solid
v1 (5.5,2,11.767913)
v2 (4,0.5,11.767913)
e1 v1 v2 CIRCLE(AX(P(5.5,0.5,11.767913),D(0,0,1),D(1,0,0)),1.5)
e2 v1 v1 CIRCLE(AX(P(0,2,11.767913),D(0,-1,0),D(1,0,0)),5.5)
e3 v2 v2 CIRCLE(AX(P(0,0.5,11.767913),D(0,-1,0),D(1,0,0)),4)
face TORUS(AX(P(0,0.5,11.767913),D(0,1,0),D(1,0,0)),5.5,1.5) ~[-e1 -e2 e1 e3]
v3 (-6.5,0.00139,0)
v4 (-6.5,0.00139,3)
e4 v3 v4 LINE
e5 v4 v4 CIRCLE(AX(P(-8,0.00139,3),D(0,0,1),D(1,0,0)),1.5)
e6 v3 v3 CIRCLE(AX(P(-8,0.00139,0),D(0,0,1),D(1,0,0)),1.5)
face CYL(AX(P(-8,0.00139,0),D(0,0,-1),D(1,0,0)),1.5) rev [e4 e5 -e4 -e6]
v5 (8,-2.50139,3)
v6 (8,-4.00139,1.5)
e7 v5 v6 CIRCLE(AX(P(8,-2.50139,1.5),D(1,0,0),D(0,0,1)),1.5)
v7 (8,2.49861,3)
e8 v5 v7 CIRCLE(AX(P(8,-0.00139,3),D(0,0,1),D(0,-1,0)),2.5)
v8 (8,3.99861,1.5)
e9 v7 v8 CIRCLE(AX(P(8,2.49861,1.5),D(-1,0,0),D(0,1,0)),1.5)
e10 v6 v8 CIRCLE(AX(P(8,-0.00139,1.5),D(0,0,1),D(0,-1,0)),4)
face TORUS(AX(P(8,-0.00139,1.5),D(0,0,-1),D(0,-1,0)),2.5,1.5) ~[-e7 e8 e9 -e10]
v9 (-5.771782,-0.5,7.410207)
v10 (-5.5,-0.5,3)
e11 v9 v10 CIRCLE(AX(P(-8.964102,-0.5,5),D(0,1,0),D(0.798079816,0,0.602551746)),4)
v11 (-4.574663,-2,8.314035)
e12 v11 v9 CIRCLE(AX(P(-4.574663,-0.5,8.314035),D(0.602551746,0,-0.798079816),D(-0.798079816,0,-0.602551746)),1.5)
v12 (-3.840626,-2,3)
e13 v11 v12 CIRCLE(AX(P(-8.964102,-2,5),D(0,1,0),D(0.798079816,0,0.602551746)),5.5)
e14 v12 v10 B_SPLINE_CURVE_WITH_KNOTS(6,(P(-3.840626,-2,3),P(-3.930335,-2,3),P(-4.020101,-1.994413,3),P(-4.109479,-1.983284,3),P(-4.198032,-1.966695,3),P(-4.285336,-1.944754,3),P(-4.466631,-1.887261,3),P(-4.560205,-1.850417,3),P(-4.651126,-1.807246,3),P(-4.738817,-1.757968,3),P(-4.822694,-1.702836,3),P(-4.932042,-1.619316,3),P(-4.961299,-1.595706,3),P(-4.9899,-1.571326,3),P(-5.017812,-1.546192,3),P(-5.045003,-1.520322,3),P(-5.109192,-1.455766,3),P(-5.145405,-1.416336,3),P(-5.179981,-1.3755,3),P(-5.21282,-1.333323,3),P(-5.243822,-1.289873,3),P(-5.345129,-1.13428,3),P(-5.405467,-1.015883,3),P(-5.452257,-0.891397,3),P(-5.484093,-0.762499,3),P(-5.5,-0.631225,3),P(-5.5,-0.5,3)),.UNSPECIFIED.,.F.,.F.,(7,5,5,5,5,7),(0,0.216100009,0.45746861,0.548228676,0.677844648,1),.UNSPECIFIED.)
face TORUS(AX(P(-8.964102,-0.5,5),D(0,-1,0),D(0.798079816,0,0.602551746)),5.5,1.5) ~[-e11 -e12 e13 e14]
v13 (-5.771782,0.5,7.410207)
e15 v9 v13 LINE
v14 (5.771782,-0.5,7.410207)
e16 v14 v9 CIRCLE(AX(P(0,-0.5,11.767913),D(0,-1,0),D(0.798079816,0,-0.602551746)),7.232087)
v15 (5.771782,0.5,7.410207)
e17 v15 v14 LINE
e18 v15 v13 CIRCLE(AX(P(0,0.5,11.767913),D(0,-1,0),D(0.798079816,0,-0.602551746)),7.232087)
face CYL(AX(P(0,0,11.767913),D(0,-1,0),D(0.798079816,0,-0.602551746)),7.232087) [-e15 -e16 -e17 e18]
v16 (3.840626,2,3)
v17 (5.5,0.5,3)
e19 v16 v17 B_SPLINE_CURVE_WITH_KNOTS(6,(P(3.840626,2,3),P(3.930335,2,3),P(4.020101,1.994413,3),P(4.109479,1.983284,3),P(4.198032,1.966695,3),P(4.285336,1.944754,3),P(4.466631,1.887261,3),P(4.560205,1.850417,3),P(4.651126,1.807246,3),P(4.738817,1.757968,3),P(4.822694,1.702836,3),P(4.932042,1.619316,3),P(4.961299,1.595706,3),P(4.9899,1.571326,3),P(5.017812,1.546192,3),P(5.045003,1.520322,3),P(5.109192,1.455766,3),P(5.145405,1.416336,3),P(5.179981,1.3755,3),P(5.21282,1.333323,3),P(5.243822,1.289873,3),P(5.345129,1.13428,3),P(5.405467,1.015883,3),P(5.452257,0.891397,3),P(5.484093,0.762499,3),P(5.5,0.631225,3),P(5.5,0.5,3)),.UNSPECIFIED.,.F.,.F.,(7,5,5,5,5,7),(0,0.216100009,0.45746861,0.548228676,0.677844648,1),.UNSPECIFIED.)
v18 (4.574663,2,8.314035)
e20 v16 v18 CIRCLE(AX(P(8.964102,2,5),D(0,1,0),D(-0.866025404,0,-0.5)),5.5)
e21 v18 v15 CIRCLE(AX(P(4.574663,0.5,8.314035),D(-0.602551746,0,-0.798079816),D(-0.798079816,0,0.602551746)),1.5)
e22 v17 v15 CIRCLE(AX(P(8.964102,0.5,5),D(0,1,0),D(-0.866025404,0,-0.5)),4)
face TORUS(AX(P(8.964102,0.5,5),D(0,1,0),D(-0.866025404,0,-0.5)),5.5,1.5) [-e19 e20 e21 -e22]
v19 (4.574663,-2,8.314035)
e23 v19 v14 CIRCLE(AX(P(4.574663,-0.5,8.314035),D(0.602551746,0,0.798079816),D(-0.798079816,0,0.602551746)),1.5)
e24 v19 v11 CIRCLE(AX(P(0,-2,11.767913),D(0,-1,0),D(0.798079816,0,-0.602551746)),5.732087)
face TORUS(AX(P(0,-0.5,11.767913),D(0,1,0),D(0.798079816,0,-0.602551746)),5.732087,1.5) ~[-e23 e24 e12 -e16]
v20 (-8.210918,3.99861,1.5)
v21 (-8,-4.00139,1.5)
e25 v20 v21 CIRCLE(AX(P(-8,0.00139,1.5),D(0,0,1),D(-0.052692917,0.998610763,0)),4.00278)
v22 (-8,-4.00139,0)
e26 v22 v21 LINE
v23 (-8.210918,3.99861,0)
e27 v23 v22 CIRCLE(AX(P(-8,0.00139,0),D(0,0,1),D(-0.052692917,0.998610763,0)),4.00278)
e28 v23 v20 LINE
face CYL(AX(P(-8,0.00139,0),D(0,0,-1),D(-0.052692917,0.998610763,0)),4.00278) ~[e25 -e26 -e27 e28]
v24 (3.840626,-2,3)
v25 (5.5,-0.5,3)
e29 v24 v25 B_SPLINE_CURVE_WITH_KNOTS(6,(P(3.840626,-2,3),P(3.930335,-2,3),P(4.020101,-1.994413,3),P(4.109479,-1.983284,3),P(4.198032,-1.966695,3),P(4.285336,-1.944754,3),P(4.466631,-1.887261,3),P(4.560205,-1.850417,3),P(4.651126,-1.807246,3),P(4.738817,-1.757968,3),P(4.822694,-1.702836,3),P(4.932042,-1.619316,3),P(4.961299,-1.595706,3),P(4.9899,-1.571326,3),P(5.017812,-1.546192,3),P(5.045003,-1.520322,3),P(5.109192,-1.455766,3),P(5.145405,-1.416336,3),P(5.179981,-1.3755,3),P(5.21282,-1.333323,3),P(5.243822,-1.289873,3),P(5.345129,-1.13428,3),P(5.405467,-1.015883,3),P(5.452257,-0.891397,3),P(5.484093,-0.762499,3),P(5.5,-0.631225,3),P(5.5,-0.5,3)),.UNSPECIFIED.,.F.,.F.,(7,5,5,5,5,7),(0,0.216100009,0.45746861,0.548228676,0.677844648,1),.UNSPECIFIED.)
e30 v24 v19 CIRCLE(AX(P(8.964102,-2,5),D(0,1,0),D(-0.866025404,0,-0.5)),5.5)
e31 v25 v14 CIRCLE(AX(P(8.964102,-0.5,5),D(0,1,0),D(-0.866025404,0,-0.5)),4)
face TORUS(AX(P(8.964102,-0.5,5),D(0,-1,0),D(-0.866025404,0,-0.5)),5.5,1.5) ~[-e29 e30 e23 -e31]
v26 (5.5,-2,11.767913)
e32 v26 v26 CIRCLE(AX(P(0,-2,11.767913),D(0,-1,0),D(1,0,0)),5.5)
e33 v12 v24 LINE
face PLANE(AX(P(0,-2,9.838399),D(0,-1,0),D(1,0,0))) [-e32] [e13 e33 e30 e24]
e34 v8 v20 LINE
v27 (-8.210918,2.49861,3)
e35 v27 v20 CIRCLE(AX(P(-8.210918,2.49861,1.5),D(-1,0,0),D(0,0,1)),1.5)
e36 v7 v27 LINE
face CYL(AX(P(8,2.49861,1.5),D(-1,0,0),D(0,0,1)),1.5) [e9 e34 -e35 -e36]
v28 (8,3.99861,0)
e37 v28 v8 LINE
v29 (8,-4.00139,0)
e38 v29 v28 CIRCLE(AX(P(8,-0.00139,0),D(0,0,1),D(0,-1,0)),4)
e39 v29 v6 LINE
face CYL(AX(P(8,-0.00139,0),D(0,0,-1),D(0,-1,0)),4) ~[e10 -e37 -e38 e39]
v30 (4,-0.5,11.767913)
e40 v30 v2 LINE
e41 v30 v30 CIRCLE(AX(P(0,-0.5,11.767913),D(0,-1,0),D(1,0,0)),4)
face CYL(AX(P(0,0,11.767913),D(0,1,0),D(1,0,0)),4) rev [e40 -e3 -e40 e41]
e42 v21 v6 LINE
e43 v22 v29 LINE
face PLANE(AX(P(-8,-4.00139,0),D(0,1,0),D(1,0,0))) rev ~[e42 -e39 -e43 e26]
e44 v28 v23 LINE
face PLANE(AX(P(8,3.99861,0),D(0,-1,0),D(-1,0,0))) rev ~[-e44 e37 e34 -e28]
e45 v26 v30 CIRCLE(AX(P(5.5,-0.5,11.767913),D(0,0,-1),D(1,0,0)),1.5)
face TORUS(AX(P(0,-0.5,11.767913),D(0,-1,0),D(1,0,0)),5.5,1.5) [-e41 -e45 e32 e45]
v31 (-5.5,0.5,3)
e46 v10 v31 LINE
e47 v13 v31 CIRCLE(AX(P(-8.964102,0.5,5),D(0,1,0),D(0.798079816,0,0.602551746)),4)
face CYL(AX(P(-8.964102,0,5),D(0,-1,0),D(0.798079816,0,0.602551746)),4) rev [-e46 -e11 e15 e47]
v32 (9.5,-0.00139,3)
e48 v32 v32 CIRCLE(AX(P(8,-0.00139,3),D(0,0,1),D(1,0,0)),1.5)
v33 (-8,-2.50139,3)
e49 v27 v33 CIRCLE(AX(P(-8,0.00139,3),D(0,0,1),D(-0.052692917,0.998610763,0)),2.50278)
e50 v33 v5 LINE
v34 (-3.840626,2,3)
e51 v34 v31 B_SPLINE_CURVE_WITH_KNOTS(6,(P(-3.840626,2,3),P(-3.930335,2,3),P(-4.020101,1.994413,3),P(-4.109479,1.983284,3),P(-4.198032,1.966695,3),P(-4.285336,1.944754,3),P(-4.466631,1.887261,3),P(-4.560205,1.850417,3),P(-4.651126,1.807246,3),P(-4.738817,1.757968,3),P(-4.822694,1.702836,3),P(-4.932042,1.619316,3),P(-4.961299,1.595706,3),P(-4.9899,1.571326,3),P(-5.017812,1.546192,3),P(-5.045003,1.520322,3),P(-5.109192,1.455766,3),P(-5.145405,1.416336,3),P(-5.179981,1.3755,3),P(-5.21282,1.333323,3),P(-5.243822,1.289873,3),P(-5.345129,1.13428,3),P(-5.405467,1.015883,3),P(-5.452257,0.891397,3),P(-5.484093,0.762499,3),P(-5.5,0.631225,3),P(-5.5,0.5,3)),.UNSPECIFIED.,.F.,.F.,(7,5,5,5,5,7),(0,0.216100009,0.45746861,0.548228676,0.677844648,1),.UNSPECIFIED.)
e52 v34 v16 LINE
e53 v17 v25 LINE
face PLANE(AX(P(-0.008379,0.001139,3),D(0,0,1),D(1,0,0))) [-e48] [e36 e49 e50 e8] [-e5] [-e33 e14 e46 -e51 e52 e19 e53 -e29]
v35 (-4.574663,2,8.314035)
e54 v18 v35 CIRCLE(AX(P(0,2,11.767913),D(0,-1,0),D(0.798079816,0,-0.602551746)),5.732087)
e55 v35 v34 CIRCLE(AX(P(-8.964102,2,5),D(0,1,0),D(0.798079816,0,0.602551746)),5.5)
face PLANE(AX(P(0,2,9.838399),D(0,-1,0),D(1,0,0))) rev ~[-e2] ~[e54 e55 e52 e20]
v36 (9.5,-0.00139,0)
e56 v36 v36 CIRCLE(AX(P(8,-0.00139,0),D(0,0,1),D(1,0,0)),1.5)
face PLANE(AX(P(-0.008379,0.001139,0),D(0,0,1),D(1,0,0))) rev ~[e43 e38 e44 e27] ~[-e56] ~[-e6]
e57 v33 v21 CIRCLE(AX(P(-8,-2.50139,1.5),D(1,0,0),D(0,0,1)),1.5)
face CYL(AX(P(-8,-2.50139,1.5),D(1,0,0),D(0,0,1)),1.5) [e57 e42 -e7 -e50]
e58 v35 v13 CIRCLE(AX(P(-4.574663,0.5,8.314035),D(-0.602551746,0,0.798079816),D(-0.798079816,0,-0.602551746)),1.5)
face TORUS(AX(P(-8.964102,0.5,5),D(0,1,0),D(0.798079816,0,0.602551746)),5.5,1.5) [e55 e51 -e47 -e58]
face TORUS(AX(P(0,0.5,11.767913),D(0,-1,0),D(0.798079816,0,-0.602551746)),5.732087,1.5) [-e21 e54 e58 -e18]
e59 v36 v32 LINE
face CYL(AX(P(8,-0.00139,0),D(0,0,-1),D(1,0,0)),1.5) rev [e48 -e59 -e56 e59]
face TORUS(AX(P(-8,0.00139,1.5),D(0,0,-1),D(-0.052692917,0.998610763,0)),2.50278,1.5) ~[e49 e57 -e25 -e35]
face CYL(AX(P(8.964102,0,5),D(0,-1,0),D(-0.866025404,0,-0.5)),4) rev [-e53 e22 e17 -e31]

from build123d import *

# Parameters (mm, degrees)
F0_R     = 1.5
F1_DEPTH = 3
F2_R     = 4
F3_DEPTH = 2
F4_R     = 1.5


# Not quite as in the source:
# - a feature names something its author has since deleted; it is built from what else it names


with BuildPart() as f1:
    # F0 (on Top) → F1 (new body)
    with BuildSketch(Plane.XY):
        with BuildLine():
            Line((7.9999998792, 3.9986097976), (-8.2109180559, 3.9986097976))
            ThreePointArc((-8.2109180559, 3.9986097976), (-12.0013898401, -0.104105532), (-7.9999998792, -4.0013902024))
            Line((-7.9999998792, -4.0013902024), (7.9999998792, -4.0013902024))
            ThreePointArc((7.9999998792, -4.0013902024), (11.9999998792, -0.0013902024), (7.9999998792, 3.9986097976))
        make_face()
        with Locations((-7.9999998792, 0.0013902024)):
            Circle(F0_R, mode=Mode.SUBTRACT)
        with Locations((7.9999998792, -0.0013902024)):
            Circle(F0_R, mode=Mode.SUBTRACT)
    extrude(amount=F1_DEPTH)

    # F2 (on Front) → F3 (join, symmetric)
    with BuildSketch(Plane.XZ):
        with BuildLine():
            Line((-5.5, 3), (5.5, 3))
            ThreePointArc((5.5, 3), (4.9716755174, 5.2460362856), (5.7717823496, 7.4102069842))
            ThreePointArc((5.7717823496, 7.4102069842), (0, 19), (-5.7717823496, 7.4102069842))
            ThreePointArc((-5.7717823496, 7.4102069842), (-4.9716755174, 5.2460362856), (-5.5, 3))
        make_face()
        with Locations((0, 11.7679133954)):
            Circle(F2_R, mode=Mode.SUBTRACT)
    extrude(amount=F3_DEPTH, both=True)

    # F4
    f4_edges = [f1.edges().sort_by_distance(p)[0] for p in [
        (0, -2, 19),
        (0, 2, 19),
        (0, -4.00139, 3),
        (-4, -2, 11.767913),
        (-4, 2, 11.767913),
    ]]
    fillet(f4_edges, radius=F4_R)


solid = f1.part
